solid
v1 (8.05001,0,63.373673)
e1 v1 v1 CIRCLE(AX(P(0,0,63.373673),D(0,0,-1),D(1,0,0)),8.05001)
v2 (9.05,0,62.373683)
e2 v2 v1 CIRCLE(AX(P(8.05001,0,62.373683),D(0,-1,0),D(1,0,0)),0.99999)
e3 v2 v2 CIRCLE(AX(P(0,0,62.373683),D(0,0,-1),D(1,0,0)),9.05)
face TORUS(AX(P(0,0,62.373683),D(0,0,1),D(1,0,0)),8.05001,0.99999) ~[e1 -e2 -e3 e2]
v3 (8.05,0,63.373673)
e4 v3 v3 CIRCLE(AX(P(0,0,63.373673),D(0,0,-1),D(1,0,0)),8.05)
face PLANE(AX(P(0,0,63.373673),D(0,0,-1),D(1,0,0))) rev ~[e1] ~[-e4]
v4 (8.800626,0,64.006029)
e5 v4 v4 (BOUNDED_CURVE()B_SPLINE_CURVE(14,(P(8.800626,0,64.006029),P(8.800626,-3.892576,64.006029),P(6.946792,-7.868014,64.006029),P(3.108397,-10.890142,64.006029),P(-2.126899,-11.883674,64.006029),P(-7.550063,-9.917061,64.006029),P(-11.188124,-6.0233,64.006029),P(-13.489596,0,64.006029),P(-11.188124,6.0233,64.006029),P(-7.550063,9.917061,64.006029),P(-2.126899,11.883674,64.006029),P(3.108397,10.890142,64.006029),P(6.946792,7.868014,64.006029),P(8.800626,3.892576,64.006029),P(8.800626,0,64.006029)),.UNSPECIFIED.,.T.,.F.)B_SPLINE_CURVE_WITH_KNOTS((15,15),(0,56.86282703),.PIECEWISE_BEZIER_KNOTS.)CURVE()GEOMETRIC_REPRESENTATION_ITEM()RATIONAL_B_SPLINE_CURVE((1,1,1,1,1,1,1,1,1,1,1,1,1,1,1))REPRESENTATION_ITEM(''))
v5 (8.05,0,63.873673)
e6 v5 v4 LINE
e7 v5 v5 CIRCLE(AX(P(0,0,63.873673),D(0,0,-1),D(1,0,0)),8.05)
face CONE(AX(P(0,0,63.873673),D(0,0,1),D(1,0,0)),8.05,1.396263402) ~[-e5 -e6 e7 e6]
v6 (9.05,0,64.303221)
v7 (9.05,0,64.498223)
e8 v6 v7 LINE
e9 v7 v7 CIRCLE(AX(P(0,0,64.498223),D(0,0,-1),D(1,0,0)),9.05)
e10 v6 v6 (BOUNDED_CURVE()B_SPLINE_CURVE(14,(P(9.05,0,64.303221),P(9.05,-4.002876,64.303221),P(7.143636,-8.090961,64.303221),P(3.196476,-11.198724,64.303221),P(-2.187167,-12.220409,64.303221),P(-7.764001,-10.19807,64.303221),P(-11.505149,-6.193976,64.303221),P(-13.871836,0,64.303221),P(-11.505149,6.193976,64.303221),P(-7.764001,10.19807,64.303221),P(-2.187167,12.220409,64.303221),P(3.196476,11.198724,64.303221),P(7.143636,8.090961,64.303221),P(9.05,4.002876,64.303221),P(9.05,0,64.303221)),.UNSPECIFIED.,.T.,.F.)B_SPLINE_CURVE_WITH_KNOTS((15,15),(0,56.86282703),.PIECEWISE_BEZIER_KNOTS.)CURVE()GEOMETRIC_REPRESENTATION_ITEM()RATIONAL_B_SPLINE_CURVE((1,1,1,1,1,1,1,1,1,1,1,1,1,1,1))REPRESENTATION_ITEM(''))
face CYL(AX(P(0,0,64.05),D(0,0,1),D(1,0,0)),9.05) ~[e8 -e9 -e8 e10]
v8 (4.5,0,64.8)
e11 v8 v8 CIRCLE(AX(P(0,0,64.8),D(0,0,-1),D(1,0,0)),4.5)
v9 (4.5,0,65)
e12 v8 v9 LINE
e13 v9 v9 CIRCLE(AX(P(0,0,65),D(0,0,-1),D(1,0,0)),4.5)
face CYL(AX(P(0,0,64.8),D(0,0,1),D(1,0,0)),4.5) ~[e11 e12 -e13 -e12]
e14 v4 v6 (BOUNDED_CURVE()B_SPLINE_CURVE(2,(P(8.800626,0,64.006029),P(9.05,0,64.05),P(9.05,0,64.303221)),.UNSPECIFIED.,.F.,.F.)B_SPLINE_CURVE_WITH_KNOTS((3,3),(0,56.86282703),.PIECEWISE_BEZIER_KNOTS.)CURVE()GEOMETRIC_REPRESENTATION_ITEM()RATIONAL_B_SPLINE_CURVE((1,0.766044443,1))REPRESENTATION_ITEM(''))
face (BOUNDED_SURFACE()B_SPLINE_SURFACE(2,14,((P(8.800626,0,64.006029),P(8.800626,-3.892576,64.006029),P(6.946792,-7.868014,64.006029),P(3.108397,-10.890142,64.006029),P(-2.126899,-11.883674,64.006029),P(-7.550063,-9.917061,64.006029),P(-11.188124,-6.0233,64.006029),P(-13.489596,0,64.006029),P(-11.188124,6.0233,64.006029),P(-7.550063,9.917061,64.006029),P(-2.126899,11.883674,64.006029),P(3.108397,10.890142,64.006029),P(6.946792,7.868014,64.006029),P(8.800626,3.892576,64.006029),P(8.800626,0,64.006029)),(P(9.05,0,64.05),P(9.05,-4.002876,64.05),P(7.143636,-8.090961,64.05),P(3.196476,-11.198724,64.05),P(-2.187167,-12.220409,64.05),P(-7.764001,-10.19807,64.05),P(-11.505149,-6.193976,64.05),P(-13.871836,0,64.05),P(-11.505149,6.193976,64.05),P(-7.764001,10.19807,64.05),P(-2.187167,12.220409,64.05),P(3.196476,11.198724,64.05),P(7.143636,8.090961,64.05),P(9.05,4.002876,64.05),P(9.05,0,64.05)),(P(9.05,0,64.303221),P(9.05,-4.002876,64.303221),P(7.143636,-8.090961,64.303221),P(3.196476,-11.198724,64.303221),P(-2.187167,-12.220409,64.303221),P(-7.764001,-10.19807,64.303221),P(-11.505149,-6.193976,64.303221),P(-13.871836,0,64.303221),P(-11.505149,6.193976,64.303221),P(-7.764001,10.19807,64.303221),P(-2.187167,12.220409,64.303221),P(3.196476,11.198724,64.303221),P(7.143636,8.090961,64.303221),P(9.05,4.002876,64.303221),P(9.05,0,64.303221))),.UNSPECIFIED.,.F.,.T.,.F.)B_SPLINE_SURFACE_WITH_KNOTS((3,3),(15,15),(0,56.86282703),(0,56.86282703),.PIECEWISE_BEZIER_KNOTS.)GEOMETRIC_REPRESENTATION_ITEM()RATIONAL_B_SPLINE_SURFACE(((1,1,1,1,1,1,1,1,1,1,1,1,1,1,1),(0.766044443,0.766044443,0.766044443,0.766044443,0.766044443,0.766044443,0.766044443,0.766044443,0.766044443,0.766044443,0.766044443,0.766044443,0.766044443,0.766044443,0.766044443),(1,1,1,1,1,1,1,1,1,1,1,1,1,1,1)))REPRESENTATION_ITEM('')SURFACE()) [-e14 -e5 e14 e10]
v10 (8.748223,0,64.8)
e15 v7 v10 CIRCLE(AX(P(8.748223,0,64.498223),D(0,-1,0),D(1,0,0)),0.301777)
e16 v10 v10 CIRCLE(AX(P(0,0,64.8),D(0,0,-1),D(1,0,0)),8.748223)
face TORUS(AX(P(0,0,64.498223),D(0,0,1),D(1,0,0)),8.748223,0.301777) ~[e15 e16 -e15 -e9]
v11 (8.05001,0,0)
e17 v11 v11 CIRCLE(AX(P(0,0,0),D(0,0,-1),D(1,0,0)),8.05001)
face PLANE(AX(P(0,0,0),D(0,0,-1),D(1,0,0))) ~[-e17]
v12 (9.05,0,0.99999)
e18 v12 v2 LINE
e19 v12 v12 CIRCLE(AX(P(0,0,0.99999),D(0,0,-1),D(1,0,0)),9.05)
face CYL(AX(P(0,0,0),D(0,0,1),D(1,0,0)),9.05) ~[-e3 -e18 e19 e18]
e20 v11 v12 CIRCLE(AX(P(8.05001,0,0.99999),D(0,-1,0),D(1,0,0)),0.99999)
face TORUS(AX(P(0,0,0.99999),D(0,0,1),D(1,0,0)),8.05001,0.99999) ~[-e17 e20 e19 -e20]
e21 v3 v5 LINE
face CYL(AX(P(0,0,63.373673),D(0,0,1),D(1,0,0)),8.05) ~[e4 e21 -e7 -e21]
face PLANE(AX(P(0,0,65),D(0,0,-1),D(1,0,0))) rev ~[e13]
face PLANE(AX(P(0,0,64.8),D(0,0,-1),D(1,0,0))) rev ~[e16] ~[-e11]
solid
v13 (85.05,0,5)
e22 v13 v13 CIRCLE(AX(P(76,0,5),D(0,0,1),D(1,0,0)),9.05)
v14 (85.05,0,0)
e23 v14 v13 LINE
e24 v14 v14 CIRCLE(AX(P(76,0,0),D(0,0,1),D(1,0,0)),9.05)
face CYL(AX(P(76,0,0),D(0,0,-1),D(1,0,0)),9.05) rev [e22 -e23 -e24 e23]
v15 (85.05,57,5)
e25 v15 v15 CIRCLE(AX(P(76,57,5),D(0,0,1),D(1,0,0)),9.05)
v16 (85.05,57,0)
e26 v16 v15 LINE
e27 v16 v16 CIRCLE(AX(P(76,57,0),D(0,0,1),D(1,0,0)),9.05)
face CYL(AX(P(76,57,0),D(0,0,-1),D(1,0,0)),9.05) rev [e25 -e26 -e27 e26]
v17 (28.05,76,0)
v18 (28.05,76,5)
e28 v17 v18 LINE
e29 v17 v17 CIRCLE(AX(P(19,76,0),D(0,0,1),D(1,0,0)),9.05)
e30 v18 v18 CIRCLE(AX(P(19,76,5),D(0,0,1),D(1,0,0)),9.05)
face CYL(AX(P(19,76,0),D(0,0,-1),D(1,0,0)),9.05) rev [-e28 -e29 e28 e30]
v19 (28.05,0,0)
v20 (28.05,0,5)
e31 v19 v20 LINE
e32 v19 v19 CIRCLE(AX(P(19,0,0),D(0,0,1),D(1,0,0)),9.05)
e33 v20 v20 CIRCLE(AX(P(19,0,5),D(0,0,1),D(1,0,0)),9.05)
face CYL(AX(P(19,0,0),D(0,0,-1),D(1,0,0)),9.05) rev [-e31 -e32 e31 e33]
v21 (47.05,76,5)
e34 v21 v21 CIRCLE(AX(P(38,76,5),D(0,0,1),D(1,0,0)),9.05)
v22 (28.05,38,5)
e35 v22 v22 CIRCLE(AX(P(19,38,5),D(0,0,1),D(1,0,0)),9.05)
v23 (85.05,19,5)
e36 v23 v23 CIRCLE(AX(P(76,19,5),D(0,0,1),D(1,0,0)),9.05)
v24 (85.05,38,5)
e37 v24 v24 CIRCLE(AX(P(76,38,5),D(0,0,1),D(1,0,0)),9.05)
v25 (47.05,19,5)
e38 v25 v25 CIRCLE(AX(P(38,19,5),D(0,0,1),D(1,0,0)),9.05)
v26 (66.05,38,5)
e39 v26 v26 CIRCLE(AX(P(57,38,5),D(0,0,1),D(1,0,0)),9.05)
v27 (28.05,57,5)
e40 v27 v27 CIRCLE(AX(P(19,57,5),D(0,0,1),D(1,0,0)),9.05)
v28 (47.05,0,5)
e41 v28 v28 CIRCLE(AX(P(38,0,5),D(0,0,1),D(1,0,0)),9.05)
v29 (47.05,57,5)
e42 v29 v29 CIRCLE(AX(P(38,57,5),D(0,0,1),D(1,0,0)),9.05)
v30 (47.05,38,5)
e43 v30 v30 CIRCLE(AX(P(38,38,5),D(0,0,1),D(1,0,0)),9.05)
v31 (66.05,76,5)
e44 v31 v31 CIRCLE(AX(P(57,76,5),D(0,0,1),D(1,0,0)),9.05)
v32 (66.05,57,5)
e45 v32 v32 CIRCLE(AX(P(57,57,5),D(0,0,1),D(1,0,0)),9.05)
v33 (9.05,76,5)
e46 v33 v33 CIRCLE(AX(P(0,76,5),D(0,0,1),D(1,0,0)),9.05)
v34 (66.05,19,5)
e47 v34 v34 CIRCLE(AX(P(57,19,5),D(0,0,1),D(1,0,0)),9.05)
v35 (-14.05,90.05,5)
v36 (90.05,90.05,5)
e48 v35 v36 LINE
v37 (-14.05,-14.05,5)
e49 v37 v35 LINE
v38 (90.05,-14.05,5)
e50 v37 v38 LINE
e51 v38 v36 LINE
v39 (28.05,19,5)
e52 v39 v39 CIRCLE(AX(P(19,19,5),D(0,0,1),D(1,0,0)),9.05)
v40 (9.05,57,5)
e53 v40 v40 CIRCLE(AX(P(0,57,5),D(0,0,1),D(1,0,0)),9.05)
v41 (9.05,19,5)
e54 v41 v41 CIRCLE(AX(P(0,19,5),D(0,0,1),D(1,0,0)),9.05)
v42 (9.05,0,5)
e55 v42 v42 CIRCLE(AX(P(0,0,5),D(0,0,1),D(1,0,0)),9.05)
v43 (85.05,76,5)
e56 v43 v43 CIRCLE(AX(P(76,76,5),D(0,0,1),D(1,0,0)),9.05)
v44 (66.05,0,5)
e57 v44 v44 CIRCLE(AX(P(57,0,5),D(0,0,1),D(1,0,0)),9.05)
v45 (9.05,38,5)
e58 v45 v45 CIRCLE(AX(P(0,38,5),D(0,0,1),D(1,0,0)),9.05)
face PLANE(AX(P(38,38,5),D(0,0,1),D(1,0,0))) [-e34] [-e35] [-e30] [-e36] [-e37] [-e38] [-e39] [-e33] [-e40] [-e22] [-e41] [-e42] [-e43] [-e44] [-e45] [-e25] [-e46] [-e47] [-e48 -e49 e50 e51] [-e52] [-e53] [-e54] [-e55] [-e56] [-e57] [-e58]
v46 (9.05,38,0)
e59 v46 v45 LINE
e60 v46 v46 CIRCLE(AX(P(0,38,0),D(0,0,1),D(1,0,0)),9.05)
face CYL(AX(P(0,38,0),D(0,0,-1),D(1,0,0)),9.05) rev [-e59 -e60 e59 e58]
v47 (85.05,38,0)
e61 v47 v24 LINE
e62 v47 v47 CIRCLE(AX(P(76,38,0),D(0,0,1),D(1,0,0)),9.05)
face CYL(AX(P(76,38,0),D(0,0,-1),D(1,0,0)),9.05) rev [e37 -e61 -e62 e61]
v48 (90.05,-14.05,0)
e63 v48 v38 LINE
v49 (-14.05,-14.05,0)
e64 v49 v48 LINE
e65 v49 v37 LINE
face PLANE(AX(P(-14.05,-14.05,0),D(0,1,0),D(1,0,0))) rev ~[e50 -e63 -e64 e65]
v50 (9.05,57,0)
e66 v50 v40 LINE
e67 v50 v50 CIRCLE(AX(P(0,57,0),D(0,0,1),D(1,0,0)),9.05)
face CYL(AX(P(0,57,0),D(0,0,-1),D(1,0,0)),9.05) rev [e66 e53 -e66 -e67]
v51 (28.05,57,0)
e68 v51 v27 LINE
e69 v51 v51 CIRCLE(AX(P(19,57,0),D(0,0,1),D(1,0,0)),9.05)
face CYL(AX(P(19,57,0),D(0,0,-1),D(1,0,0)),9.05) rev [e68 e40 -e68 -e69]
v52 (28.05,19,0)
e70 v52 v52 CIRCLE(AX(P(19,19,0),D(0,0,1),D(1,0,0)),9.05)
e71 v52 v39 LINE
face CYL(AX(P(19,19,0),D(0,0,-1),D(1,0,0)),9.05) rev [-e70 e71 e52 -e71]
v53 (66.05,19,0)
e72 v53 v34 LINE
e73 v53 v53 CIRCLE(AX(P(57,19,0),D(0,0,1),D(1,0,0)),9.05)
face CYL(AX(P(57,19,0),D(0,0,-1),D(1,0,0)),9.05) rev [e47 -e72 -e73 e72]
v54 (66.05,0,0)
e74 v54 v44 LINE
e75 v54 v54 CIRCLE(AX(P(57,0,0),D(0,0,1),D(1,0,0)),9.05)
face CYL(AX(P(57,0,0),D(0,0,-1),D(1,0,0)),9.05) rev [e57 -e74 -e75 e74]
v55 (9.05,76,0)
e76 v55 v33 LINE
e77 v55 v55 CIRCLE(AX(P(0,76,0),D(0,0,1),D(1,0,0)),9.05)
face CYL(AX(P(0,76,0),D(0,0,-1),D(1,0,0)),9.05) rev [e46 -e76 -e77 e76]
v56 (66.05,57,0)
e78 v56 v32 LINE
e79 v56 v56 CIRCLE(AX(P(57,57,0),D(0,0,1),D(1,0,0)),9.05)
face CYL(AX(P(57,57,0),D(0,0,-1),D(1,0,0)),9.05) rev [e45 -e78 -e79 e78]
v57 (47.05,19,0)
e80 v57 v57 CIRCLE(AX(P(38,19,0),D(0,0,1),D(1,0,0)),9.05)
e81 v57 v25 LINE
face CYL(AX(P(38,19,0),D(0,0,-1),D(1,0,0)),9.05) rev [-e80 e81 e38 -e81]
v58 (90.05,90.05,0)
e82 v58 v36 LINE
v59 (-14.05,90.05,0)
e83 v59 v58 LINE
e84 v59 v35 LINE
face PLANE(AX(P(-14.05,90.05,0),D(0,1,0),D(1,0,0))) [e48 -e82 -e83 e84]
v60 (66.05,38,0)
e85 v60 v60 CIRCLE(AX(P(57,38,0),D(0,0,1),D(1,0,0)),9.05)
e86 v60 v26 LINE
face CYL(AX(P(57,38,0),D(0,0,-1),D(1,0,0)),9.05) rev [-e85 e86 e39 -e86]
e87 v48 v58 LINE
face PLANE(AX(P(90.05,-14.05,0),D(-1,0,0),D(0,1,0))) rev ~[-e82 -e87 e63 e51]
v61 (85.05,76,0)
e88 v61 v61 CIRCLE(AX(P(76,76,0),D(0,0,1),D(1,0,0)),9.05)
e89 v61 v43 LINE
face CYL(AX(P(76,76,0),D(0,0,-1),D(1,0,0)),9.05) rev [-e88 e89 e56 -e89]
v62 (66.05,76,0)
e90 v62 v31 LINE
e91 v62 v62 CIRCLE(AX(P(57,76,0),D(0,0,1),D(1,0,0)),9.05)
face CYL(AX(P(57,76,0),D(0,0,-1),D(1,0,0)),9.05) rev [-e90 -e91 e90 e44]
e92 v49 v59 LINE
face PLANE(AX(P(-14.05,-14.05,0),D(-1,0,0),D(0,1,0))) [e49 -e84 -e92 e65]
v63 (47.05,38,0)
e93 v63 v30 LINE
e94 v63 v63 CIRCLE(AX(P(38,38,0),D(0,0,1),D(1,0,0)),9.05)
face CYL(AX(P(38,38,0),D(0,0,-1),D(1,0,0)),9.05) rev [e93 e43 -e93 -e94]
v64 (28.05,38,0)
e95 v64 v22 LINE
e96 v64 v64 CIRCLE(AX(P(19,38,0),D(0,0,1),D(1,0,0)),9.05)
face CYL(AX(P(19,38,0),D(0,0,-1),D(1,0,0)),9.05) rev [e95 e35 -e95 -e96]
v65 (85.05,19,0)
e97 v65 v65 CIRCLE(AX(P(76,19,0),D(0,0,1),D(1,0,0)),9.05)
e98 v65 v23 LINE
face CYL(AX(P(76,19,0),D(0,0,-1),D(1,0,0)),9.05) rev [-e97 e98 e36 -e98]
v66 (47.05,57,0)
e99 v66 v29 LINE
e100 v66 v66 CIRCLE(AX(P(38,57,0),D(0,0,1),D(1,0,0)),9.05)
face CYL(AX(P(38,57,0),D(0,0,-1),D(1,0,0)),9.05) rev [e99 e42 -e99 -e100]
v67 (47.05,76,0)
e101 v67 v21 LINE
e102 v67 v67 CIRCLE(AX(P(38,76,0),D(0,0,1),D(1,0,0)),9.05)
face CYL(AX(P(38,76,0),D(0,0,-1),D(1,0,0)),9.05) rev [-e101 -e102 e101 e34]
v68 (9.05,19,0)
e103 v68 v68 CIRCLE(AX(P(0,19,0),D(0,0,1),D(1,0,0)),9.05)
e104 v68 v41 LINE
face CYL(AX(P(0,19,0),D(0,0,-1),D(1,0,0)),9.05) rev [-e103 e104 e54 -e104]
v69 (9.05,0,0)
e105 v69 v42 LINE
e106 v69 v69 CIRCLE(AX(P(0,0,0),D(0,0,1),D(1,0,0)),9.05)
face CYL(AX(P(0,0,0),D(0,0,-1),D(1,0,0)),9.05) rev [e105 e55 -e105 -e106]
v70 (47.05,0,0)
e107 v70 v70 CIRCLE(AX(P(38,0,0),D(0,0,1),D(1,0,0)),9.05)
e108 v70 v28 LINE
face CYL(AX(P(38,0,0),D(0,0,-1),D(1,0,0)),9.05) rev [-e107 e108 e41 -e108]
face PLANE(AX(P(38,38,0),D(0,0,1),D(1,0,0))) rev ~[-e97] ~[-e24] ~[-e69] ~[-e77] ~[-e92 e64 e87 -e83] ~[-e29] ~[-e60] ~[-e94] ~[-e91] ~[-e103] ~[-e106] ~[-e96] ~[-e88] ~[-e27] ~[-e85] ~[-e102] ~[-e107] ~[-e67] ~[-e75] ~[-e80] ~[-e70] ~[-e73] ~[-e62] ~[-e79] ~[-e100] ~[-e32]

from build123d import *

# Parameters (mm, degrees)
F2_R     = 0.99999
F3_R     = 0.3017766953
F4_W     = 104.1
F4_H     = 104.1
F4_R     = 9.05
F5_DEPTH = 5


# Not quite as in the source:
# - a fillet or chamfer is up to 0.001 mm smaller than in the source, because OpenCascade refuses the exact size


with BuildPart() as f1:
    # F0 (on Front) → F1 (revolve)
    with BuildSketch(Plane.XZ):
        Polygon((0, 65), (0, 0), (9.05, 0), (9.05, 63.3736730193), (8.05, 63.3736730193), (8.05, 63.8736730193), (9.05, 64.05), (9.05, 64.8), (4.5, 64.8), (4.5, 65), align=None)
    revolve(axis=Axis((0, 0, 32.5), (0, 0, -1)))

    # F2 (radius 1 in the source; OpenCascade refuses exactly that, so slightly less here)
    f2_edges = [f1.edges().sort_by_distance(p)[0] for p in [
        (-9.05, 0, 0),
        (-9.05, 0, 63.373673),
    ]]
    fillet(f2_edges, radius=F2_R)

    # F3
    f3_edges = [f1.edges().sort_by_distance(p)[0] for p in [
        (-9.05, 0, 64.05),
        (-9.05, 0, 64.8),
    ]]
    fillet(f3_edges, radius=F3_R)


with BuildPart() as f5:
    # F4 (on Top) → F5 (new body)
    with BuildSketch(Plane.XY):
        with Locations((38, 38)):
            Rectangle(F4_W, F4_H)
        Circle(F4_R, mode=Mode.SUBTRACT)
        with Locations((19, 0)):
            Circle(F4_R, mode=Mode.SUBTRACT)
        with Locations((0, 19)):
            Circle(F4_R, mode=Mode.SUBTRACT)
        with Locations((19, 19)):
            Circle(F4_R, mode=Mode.SUBTRACT)
        with Locations((38, 0)):
            Circle(F4_R, mode=Mode.SUBTRACT)
        with Locations((57, 0)):
            Circle(F4_R, mode=Mode.SUBTRACT)
        with Locations((76, 0)):
            Circle(F4_R, mode=Mode.SUBTRACT)
        with Locations((38, 19)):
            Circle(F4_R, mode=Mode.SUBTRACT)
        with Locations((57, 19)):
            Circle(F4_R, mode=Mode.SUBTRACT)
        with Locations((76, 19)):
            Circle(F4_R, mode=Mode.SUBTRACT)
        with Locations((0, 38)):
            Circle(F4_R, mode=Mode.SUBTRACT)
        with Locations((0, 57)):
            Circle(F4_R, mode=Mode.SUBTRACT)
        with Locations((19, 38)):
            Circle(F4_R, mode=Mode.SUBTRACT)
        with Locations((19, 57)):
            Circle(F4_R, mode=Mode.SUBTRACT)
        with Locations((0, 76)):
            Circle(F4_R, mode=Mode.SUBTRACT)
        with Locations((19, 76)):
            Circle(F4_R, mode=Mode.SUBTRACT)
        with Locations((38, 38)):
            Circle(F4_R, mode=Mode.SUBTRACT)
        with Locations((57, 38)):
            Circle(F4_R, mode=Mode.SUBTRACT)
        with Locations((38, 57)):
            Circle(F4_R, mode=Mode.SUBTRACT)
        with Locations((57, 57)):
            Circle(F4_R, mode=Mode.SUBTRACT)
        with Locations((76, 38)):
            Circle(F4_R, mode=Mode.SUBTRACT)
        with Locations((76, 57)):
            Circle(F4_R, mode=Mode.SUBTRACT)
        with Locations((38, 76)):
            Circle(F4_R, mode=Mode.SUBTRACT)
        with Locations((57, 76)):
            Circle(F4_R, mode=Mode.SUBTRACT)
        with Locations((76, 76)):
            Circle(F4_R, mode=Mode.SUBTRACT)
    extrude(amount=F5_DEPTH)


solid = Compound([f1.part, f5.part])
